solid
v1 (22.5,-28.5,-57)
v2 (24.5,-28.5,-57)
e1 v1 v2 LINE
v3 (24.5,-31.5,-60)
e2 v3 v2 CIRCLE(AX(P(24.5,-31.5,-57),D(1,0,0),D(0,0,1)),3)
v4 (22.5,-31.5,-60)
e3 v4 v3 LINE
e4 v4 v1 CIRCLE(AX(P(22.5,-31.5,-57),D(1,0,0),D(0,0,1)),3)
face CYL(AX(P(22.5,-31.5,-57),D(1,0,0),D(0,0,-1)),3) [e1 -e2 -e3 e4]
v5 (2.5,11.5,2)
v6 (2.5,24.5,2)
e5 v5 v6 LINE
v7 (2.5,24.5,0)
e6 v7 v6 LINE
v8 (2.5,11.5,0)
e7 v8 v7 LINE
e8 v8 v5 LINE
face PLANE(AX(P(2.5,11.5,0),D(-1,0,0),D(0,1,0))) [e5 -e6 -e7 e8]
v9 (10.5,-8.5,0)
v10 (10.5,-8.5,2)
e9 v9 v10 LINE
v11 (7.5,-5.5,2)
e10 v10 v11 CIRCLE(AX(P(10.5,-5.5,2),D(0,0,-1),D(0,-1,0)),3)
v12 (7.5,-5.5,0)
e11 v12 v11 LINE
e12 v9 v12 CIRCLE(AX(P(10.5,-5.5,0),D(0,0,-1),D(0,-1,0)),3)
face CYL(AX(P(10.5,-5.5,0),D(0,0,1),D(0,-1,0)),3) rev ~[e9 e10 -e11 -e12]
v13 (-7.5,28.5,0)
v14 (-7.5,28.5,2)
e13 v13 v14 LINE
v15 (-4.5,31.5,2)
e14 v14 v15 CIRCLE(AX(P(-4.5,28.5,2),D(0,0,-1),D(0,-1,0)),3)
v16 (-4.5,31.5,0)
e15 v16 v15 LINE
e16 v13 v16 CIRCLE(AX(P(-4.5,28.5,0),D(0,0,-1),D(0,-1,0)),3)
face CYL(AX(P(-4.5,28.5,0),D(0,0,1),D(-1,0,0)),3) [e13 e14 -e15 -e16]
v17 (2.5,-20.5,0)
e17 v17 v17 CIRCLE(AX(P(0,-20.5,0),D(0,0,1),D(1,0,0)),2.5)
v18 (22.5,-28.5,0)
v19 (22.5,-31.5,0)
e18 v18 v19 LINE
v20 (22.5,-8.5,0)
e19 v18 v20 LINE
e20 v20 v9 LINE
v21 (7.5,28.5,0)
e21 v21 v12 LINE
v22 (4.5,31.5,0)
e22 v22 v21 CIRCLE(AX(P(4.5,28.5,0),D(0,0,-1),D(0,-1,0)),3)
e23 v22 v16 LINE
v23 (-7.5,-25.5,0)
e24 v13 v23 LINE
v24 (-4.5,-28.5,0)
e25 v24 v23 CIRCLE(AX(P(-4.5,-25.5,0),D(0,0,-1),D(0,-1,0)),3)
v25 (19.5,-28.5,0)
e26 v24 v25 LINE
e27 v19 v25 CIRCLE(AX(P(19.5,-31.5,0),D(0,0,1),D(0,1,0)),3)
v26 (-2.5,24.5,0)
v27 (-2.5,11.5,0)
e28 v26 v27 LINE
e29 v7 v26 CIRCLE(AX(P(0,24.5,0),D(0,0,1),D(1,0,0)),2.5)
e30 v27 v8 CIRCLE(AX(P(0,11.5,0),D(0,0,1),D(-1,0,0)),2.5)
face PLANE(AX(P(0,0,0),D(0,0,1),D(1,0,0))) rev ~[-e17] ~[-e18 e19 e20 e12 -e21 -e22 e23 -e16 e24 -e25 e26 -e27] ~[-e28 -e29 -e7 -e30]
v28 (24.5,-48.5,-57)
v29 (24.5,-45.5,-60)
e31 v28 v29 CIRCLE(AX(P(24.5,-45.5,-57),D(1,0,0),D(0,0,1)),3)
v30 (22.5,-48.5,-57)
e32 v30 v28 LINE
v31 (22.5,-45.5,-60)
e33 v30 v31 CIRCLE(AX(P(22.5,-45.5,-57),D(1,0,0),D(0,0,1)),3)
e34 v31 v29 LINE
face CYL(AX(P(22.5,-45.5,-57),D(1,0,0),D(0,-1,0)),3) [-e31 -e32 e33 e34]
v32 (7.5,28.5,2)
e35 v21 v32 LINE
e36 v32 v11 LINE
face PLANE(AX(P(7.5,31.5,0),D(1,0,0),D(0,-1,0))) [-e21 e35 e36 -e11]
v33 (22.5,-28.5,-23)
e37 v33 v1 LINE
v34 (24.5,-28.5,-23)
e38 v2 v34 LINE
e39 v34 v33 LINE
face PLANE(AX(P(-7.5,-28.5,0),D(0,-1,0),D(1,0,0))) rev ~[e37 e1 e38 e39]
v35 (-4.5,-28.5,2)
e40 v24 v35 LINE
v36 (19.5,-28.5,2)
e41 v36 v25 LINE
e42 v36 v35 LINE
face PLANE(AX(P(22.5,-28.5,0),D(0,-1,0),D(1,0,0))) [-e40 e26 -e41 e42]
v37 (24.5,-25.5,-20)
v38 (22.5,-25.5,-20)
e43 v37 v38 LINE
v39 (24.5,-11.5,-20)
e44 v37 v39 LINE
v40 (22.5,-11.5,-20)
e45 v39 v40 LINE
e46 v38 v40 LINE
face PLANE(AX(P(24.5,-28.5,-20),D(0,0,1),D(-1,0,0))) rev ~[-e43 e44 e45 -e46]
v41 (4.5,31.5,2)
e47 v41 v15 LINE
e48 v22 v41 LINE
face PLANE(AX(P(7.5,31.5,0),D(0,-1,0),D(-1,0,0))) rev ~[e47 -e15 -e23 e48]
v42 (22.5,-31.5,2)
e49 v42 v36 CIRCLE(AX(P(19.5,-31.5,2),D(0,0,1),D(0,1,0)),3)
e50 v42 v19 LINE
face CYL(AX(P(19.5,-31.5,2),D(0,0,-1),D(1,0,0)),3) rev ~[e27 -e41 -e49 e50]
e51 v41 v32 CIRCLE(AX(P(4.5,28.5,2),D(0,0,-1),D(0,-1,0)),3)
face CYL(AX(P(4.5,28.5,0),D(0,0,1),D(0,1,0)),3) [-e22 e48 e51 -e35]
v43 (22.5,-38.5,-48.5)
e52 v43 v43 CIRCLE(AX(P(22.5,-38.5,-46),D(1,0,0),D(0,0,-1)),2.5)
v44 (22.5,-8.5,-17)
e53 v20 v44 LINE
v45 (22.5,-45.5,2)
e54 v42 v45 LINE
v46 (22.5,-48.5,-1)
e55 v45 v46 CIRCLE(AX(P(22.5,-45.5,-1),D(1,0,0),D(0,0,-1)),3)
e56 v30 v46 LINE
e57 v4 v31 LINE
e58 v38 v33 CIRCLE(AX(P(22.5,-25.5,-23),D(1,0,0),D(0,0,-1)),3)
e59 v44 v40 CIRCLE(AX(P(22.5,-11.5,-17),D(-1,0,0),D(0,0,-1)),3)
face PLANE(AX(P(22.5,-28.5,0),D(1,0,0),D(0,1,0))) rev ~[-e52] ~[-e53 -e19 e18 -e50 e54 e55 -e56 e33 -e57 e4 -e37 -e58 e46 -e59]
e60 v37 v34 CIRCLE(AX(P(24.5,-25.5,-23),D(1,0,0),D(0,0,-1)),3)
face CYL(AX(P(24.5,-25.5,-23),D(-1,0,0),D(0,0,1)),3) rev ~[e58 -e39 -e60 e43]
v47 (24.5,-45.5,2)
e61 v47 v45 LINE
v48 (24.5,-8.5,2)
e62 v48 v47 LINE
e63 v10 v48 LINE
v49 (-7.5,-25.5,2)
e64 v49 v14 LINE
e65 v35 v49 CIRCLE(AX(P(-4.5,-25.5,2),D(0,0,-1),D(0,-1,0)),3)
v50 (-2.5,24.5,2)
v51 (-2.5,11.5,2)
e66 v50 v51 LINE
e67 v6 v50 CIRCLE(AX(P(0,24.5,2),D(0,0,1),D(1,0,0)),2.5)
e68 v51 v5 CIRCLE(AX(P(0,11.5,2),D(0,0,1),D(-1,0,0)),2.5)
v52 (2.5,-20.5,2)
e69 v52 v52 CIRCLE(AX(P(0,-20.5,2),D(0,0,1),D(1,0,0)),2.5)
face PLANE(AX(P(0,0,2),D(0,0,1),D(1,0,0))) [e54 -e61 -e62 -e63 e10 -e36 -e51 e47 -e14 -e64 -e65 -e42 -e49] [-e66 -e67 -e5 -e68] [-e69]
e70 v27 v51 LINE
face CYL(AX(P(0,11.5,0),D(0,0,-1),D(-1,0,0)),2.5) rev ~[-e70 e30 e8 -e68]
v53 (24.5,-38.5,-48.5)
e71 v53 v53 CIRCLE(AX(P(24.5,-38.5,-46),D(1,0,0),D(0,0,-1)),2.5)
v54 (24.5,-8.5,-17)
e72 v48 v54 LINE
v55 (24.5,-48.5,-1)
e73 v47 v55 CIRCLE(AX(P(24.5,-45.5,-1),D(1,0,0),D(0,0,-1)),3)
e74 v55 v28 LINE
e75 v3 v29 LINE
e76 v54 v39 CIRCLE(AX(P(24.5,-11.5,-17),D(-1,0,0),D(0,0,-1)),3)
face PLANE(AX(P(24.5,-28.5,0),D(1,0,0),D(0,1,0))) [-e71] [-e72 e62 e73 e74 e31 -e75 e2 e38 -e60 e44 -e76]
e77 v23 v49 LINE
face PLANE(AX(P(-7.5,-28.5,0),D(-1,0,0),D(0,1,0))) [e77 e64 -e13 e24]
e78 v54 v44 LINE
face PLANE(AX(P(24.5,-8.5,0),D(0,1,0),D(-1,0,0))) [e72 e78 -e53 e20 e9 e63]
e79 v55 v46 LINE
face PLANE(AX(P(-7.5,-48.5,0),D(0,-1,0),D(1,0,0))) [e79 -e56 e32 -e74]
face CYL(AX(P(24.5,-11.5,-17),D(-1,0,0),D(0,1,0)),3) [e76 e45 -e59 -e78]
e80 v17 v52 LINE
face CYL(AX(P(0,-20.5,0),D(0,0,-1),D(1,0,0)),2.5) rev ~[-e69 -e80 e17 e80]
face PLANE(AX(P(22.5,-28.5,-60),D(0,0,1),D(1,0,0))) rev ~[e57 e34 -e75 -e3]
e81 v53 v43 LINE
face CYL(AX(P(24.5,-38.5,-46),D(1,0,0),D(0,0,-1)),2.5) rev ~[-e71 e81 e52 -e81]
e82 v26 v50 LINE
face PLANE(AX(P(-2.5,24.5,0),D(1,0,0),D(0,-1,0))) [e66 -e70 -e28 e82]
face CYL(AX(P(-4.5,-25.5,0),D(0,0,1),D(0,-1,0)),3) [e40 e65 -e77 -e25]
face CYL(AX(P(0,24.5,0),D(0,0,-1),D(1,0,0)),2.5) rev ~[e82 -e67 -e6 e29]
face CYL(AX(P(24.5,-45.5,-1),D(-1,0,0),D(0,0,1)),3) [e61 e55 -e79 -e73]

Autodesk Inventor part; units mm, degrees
ref_plane "YZ Plane" through (0, 0, 0) normal (1, 0, 0) x (0, 1, 0)
ref_plane "XZ Plane" through (0, 0, 0) normal (0, 1, 0) x (-1, 0, 0)
ref_plane "XY Plane" through (0, 0, 0) normal (0, 0, 1) x (1, 0, 0)
sketch "Sketch1" plane through (0, 0, 0) normal (0, 0, 1) x (1, 0, 0)
  line L0 (7.5, -28.5) -> (-7.5, -28.5)
  line L1 (-7.5, -28.5) -> (-7.5, 28.5)
  line L2 (-7.5, 28.5) -> (7.5, -28.5) construction
  line L3 (7.5, 28.5) -> (-7.5, -28.5) construction
  circle A0 centre (0, -20.5) radius 2.5
  line L4 (0, 24.5) -> (0, 11.5) construction
  line L5 (-2.5, 24.5) -> (-2.5, 11.5)
  line L6 (2.5, 11.5) -> (2.5, 24.5)
  arc A1 (2.5, 24.5) -> (-2.5, 24.5) centre (0, 24.5) ccw
  arc A2 (-2.5, 11.5) -> (2.5, 11.5) centre (0, 11.5) ccw
  line L7 (7.5, 31.5) -> (-7.5, 31.5)
  line L8 (-7.5, 31.5) -> (-7.5, -28.5)
  line L9 (7.5, 31.5) -> (7.5, -28.5)
  line L10 (7.5, -8.5) -> (7.5, -28.5)
  line L11 (7.5, -28.5) -> (22.5, -28.5)
  line L12 (22.5, -28.5) -> (22.5, -8.5)
  line L13 (22.5, -8.5) -> (7.5, -8.5)
  line L14 (7.5, -8.5) -> (7.5, -28.5)
  line L15 (22.5, -28.5) -> (24.5, -28.5)
  line L16 (24.5, -28.5) -> (24.5, -8.5)
  line L17 (24.5, -8.5) -> (22.5, -8.5)
  line L18 (22.5, -8.5) -> (22.5, -28.5)
  point P0 (0, 0)
  point P1 (0, 18)
  dimension "d7" = 15
  dimension "d8" = 57
  dimension "d9" = 5
  dimension "d10" = 13
  dimension "d11" = 5
  dimension "d12" = 60
  dimension "d39" = 15
  dimension "d40" = 20
  dimension "d41" = 2
extrude "Extrusion1" add sketch "Sketch1" along normal blind 2 contours L0 L1 L8 L7 L9
extrude "Extrusion2" add sketch "Sketch1" along normal blind 2 contours L9 L13 L12 L11 | L12 L17 L16 L15
extrude "Extrusion8" add sketch "Sketch1" against normal blind 60 contours L12 L17 L16 L15
sketch "Sketch6" plane through (-7.5, -28.5, 0) normal (0, -1, 0) x (1, 0, 0)
  line L0 (32, -60) -> (32, 2) projected
  line L1 (30, 0) -> (30, -60) projected
  line L2 (32, 2) -> (30, 2)
  line L3 (30, 2) -> (30, -60)
  line L4 (30, -60) -> (32, -60)
  line L5 (32, -60) -> (32, 2)
  line L6 (30, -60) -> (32, -60)
  line L7 (32, -60) -> (32, -20)
  line L8 (32, -20) -> (30, -20)
  line L9 (30, -20) -> (30, -60)
  point P0 (7.5, 0)
  dimension "d51" = 40
extrude "Extrusion9" cut sketch "Sketch6" against normal blind 20 contours L4 L1 L8 L0
extrude "Extrusion11" add sketch "Sketch6" along normal blind 20
sketch "Sketch8" plane through (24.5, -8.5, 2) normal (1, 0, 0) x (0, 0, -1)
  circle A0 centre (48, -30) radius 2.5
  point P0 (2, 8.5)
  dimension "d54" = 5
extrude "Extrusion12" cut sketch "Sketch8" against normal up to surface (2 mm away)
fillet "Fillet1" radius 3 10 edges at (23.5, -48.5, 2) (23.5, -8.5, -20) (23.5, -28.5, -20) (23.5, -28.5, -60) (23.5, -48.5, -60) (7.5, -8.5, 1) (22.5, -28.5, 1) (-7.5, -28.5, 1) (7.5, 31.5, 1) (-7.5, 31.5, 1)
properties part number "Rectangle_plate[1]"
